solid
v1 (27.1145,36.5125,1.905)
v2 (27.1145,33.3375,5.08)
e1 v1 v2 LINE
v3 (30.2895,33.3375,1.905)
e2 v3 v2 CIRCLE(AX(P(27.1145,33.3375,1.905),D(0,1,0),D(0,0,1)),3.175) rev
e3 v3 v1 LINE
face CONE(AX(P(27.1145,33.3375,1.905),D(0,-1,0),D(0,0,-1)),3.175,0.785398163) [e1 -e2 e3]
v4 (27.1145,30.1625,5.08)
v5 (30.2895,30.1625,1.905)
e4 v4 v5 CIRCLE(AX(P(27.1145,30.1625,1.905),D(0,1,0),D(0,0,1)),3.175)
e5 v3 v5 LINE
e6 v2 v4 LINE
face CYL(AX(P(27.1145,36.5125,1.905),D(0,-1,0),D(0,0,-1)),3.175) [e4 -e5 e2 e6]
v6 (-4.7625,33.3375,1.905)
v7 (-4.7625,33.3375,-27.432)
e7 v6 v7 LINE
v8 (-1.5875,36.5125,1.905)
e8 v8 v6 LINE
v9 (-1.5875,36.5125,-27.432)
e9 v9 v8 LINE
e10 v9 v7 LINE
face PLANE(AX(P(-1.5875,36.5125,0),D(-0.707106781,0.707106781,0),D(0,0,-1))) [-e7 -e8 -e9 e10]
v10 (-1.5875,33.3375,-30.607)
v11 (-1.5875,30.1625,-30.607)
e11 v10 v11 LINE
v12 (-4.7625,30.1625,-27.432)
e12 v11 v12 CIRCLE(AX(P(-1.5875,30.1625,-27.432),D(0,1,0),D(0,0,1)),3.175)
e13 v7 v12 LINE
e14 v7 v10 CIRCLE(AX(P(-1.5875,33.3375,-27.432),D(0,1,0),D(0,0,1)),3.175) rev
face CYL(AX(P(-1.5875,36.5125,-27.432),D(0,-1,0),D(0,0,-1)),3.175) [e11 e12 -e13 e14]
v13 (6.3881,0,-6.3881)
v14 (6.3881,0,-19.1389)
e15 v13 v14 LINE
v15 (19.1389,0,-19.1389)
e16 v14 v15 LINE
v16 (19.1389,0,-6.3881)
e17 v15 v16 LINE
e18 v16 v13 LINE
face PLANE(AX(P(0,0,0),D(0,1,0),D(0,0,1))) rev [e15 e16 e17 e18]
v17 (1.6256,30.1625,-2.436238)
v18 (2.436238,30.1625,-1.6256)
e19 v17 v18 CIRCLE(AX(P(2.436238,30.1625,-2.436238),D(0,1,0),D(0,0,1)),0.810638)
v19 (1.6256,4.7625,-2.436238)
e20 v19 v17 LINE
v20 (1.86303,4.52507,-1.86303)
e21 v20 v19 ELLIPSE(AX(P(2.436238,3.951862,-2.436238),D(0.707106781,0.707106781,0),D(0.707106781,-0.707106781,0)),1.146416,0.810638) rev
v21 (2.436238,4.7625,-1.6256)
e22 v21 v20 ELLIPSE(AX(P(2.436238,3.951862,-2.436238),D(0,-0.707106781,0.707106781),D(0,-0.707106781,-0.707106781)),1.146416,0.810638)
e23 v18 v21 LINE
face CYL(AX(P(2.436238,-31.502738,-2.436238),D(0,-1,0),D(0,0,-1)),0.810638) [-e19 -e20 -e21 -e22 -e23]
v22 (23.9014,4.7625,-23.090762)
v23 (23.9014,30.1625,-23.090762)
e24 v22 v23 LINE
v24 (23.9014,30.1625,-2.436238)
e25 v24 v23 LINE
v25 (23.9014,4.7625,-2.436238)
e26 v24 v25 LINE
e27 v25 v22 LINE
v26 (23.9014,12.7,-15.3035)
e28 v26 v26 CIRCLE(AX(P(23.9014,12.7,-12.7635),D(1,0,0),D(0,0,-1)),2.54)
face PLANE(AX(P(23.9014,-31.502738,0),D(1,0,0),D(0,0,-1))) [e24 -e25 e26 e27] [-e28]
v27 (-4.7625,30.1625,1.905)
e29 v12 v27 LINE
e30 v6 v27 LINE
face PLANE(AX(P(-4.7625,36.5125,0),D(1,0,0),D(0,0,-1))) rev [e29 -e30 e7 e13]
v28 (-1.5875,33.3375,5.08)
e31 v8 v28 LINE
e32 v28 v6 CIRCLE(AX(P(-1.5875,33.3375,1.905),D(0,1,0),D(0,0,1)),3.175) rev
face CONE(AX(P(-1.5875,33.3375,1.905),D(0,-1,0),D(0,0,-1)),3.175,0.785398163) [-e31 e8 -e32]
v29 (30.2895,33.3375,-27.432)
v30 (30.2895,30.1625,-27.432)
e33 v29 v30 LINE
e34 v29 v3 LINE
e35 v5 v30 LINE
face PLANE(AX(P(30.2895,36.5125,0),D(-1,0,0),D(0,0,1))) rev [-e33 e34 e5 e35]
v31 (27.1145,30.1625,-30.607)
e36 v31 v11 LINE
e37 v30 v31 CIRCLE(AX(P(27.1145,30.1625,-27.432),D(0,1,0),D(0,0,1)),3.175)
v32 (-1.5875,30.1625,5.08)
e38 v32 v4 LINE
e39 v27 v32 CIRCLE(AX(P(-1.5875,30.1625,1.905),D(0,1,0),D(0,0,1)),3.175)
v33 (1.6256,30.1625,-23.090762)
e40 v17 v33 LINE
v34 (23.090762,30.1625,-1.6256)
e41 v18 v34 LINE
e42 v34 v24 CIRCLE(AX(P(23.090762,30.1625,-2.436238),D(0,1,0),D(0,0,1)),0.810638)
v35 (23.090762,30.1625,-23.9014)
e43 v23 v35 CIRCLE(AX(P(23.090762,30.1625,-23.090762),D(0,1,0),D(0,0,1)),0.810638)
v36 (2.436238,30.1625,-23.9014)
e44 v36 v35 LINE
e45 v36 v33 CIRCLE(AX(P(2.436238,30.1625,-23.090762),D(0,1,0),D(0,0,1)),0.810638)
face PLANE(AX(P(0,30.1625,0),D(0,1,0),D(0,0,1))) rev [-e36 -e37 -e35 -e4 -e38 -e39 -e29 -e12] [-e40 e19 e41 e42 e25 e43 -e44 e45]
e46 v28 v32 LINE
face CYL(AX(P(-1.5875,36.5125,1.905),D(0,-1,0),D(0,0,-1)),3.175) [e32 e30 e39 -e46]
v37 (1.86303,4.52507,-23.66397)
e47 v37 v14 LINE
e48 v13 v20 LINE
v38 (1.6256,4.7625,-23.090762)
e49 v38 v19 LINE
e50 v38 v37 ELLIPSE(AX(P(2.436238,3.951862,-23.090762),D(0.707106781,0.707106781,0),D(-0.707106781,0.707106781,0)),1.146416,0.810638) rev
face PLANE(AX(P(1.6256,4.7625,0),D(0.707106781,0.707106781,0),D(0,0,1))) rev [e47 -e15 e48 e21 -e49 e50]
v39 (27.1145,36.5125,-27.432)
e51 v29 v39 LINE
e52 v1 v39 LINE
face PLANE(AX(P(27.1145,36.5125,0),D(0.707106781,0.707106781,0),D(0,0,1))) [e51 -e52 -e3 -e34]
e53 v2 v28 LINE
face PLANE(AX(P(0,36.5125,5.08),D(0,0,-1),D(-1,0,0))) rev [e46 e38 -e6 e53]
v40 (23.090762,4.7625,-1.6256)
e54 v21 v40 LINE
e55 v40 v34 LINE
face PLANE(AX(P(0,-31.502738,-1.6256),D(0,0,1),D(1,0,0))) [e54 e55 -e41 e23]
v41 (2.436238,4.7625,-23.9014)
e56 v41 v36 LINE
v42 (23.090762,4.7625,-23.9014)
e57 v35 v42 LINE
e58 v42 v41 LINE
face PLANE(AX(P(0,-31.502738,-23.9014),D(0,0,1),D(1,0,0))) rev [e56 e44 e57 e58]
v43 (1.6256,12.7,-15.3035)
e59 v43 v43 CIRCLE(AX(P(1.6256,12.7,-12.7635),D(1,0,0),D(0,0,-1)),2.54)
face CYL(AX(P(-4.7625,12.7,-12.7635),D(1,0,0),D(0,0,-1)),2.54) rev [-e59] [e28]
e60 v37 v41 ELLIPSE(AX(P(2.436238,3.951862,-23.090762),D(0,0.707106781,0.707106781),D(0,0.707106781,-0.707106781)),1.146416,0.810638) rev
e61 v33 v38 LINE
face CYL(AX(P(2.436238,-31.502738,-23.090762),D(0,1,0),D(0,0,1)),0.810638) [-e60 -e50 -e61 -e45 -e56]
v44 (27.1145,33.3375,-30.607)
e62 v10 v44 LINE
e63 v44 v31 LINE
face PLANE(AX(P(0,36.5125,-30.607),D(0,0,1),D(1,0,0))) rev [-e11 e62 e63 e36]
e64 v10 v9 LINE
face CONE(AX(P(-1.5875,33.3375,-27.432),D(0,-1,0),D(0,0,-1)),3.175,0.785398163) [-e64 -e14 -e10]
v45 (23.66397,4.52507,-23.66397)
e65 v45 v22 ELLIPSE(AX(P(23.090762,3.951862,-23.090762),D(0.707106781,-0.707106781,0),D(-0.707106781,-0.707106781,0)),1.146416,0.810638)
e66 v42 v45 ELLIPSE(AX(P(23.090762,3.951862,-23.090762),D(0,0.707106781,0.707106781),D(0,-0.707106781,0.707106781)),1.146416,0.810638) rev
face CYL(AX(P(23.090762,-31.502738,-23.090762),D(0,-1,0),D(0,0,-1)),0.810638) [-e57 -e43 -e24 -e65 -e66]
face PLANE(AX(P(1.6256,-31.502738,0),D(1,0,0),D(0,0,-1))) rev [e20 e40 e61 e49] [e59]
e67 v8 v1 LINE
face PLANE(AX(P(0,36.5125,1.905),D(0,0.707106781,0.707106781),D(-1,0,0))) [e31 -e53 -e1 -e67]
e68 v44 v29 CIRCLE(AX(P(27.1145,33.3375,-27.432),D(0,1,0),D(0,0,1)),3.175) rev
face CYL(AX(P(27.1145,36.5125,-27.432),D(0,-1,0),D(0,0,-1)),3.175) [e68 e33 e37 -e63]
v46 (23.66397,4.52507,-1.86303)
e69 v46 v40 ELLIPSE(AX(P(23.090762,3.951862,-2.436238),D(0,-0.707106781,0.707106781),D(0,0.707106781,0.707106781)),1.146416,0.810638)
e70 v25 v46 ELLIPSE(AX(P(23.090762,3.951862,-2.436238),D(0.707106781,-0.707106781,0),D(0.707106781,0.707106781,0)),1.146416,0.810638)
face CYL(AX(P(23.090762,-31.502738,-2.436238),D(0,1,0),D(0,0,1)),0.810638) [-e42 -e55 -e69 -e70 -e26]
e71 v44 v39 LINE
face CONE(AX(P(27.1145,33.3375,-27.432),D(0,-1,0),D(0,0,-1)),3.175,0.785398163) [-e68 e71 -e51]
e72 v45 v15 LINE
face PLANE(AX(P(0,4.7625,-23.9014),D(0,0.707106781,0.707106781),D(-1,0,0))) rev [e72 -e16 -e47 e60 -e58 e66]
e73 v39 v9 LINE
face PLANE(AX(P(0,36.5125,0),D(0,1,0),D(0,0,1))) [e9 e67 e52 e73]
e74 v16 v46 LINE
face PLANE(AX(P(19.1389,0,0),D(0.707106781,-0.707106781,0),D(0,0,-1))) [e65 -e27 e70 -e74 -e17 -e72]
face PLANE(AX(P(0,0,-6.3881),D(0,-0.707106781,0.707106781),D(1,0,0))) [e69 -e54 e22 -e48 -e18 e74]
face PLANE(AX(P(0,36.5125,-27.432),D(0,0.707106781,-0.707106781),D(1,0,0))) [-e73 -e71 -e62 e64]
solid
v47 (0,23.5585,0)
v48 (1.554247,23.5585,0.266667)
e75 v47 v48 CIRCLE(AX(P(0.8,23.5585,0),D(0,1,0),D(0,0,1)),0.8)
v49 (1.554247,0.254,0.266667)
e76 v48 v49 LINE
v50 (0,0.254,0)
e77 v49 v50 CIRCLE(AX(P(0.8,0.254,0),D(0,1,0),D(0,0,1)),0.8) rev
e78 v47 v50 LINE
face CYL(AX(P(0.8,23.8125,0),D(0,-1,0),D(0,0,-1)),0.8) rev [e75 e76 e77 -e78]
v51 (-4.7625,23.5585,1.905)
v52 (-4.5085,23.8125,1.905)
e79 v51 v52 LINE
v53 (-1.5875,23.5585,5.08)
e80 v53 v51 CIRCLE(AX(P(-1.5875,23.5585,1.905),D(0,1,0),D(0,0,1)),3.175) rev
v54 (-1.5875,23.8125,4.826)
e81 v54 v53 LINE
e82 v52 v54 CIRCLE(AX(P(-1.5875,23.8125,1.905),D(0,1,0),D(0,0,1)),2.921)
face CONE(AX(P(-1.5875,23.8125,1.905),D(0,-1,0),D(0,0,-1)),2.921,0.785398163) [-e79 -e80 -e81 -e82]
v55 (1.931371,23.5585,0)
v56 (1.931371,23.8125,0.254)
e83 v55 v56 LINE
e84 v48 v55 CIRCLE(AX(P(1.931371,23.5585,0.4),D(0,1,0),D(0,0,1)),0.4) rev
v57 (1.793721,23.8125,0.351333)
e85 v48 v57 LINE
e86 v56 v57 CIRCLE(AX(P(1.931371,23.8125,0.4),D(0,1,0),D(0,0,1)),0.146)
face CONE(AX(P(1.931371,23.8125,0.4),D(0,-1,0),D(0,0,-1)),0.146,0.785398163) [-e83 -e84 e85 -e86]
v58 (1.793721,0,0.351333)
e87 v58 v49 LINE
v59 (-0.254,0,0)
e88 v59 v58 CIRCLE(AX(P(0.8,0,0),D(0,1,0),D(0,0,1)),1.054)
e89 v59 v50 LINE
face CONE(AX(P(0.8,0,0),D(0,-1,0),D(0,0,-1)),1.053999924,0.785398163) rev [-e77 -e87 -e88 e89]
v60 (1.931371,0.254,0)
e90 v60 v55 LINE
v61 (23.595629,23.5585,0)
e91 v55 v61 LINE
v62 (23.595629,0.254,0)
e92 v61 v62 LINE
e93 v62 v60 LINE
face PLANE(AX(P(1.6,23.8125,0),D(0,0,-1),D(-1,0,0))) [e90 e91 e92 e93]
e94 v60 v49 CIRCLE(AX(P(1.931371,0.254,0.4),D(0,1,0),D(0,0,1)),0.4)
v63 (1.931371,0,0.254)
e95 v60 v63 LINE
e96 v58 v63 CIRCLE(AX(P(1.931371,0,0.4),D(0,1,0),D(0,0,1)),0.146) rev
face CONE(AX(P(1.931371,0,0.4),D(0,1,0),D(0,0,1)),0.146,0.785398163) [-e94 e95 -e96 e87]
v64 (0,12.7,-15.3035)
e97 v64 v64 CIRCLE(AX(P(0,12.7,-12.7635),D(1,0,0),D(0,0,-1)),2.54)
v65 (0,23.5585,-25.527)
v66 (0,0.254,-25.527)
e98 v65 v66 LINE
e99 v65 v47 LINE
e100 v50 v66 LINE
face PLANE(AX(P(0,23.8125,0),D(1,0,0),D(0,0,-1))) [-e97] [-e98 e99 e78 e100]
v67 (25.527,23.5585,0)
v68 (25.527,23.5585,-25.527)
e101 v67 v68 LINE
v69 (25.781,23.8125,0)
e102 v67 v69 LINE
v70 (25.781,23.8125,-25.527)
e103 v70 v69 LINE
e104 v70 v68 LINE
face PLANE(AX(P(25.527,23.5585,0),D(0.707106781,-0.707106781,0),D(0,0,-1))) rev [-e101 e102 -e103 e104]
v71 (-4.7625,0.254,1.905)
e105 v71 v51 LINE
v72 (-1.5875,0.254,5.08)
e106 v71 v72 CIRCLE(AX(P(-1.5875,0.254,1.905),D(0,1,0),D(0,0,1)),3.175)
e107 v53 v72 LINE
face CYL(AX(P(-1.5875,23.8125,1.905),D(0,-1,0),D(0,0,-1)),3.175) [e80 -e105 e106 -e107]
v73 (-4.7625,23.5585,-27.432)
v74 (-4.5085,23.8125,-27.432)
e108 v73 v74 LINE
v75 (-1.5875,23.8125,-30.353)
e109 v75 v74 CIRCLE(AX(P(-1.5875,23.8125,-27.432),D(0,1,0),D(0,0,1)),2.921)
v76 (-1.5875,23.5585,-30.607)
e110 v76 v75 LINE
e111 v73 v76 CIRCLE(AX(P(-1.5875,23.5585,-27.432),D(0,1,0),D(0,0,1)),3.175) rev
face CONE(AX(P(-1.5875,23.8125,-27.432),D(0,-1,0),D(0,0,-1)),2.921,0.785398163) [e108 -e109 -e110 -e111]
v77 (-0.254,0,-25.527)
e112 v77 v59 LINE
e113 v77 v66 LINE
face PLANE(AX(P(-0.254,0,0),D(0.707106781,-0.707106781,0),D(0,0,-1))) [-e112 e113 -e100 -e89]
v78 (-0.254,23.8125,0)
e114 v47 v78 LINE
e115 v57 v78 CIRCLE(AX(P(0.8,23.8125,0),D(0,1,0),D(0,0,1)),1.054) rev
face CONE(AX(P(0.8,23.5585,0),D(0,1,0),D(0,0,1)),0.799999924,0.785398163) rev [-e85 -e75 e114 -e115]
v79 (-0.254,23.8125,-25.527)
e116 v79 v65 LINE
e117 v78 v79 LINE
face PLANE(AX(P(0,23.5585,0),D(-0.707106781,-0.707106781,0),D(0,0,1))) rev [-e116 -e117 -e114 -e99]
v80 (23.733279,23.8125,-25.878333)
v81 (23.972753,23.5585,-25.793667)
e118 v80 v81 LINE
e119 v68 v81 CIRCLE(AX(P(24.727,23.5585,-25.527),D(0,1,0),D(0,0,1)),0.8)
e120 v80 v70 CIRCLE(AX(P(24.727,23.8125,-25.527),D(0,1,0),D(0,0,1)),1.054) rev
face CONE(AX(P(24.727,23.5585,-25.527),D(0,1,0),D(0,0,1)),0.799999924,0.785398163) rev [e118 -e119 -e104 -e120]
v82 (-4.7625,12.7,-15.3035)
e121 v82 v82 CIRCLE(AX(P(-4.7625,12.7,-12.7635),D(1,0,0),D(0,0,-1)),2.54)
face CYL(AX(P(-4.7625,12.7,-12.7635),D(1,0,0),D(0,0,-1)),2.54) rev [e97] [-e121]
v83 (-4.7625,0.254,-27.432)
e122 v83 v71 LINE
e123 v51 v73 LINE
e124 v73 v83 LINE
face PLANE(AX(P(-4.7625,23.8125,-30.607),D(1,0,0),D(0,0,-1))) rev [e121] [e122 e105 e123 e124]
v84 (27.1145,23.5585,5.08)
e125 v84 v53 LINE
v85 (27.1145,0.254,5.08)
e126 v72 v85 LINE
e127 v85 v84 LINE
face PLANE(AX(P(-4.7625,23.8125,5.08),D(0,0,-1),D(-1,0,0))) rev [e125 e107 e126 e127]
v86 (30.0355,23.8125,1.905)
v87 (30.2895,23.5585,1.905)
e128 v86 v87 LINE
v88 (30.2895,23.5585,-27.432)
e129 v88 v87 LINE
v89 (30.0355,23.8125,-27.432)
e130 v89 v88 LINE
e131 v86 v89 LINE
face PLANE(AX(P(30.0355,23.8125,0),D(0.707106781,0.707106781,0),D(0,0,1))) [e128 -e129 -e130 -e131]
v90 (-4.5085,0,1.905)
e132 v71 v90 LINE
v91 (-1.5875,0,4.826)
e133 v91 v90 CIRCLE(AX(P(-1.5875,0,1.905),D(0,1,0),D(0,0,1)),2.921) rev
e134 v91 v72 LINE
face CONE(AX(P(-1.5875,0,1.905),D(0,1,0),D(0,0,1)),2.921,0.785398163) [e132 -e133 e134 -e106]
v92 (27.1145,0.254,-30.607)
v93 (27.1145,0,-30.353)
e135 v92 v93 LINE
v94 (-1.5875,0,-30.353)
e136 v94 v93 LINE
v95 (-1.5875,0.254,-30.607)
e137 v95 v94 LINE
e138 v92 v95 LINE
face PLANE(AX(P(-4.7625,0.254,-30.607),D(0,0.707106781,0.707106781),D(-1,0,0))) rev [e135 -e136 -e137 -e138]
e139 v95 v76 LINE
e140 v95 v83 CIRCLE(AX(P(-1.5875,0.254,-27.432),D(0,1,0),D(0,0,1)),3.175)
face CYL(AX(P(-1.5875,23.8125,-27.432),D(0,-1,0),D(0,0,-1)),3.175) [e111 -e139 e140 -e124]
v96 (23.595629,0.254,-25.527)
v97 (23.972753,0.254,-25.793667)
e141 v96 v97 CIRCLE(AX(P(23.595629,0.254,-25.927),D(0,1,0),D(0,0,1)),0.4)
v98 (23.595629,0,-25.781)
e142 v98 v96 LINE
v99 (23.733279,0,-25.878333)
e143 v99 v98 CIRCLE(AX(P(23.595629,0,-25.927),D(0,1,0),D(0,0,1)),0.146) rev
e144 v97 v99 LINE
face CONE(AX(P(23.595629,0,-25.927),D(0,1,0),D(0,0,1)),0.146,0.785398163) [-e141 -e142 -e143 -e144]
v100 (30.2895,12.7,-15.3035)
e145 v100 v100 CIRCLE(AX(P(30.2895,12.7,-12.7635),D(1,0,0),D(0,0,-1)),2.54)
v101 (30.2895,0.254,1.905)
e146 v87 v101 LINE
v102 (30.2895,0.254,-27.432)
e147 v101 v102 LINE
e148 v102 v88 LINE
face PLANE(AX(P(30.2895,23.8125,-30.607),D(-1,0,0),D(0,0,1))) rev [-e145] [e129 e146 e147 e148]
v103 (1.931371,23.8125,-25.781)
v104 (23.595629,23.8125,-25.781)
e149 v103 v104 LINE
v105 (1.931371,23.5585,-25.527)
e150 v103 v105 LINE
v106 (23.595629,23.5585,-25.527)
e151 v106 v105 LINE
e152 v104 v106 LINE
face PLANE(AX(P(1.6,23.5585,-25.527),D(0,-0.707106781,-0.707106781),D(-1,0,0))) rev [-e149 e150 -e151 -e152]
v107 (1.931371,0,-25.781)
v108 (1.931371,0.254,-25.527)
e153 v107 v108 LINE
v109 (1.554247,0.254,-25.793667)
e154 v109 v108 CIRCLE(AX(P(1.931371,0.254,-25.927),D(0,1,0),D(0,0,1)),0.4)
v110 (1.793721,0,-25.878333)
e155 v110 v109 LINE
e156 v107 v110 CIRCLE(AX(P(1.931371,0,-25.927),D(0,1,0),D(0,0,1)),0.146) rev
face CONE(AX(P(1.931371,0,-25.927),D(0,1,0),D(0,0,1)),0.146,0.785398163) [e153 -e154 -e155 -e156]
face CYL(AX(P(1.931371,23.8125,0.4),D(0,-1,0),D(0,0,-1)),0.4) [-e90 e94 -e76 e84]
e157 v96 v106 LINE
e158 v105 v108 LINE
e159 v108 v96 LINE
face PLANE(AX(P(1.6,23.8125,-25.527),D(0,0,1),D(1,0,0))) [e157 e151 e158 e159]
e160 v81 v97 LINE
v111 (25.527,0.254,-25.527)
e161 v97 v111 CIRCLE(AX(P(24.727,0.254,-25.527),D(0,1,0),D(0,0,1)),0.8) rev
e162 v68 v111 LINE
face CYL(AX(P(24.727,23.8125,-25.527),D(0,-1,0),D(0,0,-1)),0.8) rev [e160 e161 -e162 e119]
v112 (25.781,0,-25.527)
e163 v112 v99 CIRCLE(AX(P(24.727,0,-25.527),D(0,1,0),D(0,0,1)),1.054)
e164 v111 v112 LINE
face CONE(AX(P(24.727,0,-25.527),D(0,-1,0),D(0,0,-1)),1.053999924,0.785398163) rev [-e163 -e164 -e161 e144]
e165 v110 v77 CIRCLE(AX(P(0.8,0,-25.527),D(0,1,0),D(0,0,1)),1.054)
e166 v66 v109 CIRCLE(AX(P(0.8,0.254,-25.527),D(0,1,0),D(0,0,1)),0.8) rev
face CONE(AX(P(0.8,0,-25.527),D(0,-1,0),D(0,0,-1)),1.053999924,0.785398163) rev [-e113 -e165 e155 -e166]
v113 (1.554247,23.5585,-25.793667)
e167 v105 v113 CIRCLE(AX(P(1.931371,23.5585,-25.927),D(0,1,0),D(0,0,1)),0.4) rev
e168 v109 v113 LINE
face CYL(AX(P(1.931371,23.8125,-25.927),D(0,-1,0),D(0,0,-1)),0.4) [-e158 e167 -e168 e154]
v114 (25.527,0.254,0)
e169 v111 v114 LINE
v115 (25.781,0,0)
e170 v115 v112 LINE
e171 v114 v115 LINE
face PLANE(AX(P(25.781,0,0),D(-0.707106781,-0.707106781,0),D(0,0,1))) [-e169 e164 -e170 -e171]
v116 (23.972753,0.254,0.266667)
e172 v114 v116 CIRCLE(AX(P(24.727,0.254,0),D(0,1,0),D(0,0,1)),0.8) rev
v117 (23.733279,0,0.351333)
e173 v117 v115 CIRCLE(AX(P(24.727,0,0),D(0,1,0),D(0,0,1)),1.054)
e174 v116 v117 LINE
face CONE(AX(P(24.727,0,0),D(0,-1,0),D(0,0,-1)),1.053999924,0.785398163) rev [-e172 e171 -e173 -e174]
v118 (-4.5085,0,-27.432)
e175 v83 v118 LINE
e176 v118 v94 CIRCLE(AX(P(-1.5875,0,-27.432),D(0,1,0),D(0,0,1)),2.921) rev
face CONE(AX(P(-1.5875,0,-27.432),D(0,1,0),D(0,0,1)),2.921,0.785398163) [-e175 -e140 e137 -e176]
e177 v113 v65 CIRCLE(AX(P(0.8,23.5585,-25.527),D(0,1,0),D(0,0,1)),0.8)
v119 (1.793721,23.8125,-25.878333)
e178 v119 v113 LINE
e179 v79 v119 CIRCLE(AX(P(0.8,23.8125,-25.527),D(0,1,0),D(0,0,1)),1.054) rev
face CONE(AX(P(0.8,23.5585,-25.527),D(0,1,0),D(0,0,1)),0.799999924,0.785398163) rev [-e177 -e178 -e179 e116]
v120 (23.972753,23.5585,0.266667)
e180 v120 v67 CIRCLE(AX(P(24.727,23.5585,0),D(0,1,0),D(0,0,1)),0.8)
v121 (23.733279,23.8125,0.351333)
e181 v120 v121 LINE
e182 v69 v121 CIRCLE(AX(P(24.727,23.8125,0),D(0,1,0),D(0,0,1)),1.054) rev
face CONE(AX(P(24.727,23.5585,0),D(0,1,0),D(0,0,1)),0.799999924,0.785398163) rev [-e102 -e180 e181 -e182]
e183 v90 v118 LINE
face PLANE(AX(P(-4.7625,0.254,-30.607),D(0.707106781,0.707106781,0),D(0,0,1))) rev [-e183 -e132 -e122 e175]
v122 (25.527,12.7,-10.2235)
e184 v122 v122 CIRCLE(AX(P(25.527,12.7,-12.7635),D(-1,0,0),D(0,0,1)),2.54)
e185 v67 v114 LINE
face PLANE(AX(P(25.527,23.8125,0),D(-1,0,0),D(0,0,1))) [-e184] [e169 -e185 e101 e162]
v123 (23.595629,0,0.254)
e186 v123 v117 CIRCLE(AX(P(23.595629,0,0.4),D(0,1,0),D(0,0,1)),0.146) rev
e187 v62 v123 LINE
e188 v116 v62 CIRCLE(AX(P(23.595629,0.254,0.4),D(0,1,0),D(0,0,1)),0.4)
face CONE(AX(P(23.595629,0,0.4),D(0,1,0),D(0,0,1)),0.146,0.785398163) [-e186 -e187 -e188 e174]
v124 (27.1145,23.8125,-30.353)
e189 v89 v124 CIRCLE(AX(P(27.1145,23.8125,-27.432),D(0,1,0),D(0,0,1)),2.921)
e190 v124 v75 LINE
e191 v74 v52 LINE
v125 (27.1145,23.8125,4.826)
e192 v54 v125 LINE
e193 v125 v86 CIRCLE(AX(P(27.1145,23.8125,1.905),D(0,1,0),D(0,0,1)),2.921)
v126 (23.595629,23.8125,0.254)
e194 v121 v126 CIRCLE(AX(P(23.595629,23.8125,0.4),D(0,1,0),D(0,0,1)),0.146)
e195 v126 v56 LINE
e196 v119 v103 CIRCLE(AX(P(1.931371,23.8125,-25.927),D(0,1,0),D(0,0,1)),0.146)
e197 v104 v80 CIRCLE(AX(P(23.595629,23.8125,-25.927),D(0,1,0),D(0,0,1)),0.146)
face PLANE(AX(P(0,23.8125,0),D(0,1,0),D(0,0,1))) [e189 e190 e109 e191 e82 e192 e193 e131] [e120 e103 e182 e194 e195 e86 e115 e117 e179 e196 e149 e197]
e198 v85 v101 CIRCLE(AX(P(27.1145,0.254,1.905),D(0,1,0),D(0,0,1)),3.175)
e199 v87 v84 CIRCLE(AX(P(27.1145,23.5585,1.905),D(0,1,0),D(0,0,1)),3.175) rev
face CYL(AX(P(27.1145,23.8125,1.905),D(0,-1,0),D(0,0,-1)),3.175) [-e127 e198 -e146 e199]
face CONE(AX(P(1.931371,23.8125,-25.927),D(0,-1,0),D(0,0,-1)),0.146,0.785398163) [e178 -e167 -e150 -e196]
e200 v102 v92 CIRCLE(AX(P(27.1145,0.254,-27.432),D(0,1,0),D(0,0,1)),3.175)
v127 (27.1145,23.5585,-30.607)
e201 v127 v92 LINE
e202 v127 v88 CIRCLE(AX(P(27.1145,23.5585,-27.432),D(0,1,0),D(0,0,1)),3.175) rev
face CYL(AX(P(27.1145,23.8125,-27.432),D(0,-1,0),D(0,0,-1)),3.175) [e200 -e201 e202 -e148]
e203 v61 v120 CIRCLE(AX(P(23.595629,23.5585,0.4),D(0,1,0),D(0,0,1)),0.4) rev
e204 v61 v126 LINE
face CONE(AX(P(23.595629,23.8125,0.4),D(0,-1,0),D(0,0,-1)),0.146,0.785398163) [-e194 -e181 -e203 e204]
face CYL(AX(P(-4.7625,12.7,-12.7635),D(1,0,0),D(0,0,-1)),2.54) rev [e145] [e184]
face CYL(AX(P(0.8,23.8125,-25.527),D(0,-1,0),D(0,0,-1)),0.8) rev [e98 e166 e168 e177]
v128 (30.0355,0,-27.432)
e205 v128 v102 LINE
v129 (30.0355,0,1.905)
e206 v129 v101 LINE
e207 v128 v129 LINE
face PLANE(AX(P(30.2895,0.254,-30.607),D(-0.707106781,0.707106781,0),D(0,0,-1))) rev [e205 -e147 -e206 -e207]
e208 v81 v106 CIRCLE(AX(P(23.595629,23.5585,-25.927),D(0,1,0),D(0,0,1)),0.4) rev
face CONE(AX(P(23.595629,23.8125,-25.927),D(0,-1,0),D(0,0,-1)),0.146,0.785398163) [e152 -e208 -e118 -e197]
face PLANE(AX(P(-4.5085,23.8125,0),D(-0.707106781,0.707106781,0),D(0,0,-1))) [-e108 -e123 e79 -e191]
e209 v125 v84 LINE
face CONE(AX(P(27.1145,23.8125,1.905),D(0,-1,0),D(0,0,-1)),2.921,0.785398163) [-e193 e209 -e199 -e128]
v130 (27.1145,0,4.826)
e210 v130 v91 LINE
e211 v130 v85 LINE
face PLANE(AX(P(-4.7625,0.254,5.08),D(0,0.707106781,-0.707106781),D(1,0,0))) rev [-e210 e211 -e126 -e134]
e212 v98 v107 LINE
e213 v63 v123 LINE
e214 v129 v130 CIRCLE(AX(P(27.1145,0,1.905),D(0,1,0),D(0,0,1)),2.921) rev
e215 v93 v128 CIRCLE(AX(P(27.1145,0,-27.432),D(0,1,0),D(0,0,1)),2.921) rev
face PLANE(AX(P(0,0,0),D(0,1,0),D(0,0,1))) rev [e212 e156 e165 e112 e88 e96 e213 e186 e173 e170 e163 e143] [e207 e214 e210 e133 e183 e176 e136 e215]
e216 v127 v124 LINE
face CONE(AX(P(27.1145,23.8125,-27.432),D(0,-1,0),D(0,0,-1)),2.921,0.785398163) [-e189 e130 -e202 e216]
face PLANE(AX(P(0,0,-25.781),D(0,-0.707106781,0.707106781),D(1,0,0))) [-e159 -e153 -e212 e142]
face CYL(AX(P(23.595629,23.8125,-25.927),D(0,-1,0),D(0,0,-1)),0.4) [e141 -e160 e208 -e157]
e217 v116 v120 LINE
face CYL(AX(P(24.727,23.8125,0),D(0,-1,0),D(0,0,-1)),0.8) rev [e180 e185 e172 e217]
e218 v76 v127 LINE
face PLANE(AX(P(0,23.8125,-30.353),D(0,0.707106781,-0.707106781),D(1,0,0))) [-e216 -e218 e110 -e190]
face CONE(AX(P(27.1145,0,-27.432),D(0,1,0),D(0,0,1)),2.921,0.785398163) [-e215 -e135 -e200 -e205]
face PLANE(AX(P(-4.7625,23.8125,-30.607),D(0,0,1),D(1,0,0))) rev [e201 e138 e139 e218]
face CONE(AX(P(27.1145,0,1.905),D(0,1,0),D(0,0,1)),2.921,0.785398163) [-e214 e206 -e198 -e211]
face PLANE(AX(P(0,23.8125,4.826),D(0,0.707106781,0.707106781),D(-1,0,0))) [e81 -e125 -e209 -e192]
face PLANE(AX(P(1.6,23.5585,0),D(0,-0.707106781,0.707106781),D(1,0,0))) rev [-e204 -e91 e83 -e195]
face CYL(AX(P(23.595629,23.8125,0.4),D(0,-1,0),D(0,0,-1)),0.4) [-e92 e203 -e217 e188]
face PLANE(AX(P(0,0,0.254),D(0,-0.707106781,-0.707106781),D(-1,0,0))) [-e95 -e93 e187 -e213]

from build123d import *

# Parameters (mm, degrees)
SKETCH1_W           = 35.052
SKETCH1_H           = 35.687
BOSS_EXTRUDE1_DEPTH = 23.8125
FILLET1_R           = 3.175
FILLET2_R           = 0.4
SKETCH2_W           = 22.2758
SKETCH2_H           = 22.2758
BOSS_EXTRUDE2_DEPTH = 6.35
SKETCH2_4_W         = 22.2758
SKETCH2_4_H         = 22.2758
BOSS_EXTRUDE3_DEPTH = 30.1625
CHAMFER1_SIZE       = 3.175
CHAMFER2_SIZE       = 4.7625
CHAMFER3_SIZE       = 0.254
FILLET3_R           = 0.810638298
SKETCH3_R           = 2.54
CUT_EXTRUDE1_DEPTH  = 60.148912156


with BuildPart() as part:
    # Sketch1 → Boss-Extrude1 (new body)
    with BuildSketch(Plane(origin=(0, 0, 0), x_dir=(1, 0, 0), z_dir=(0, 1, 0))):
        with Locations((12.7635, 12.7635)):
            Rectangle(SKETCH1_W, SKETCH1_H)
        with BuildLine():
            Line((1.599999848, 0), (23.927000152, 0))
            ThreePointArc((23.927000152, 0), (24.727000076, -0.799999924), (25.527, 0))
            Line((25.527, 0), (25.527, 25.527))
            ThreePointArc((25.527, 25.527), (24.727000076, 26.326999924), (23.927000152, 25.527))
            Line((23.927000152, 25.527), (1.599999848, 25.527))
            ThreePointArc((1.599999848, 25.527), (0.799999924, 26.326999924), (0, 25.527))
            Line((0, 25.527), (0, 0))
            ThreePointArc((0, 0), (0.799999924, -0.799999924), (1.599999848, 0))
        make_face(mode=Mode.SUBTRACT)
    extrude(amount=BOSS_EXTRUDE1_DEPTH)

    # Fillet1
    fillet1_edges = [part.edges().sort_by_distance(p)[0] for p in [
        (-4.7625, 11.90625, -30.607),
        (30.2895, 11.90625, -30.607),
        (30.2895, 11.90625, 5.08),
        (-4.7625, 11.90625, 5.08),
    ]]
    fillet(fillet1_edges, radius=FILLET1_R)

    # Fillet2
    fillet2_edges = [part.edges().sort_by_distance(p)[0] for p in [
        (1.599999848, 11.90625, 0),
        (23.927000152, 11.90625, 0),
        (23.927000152, 11.90625, -25.527),
        (1.599999848, 11.90625, -25.527),
    ]]
    fillet(fillet2_edges, radius=FILLET2_R)

    # Chamfer3
    chamfer3_edges = [part.edges().sort_by_distance(p)[0] for p in [
        (0.664718345, 0, 0.788478771),
        (25.527, 0, -12.7635),
        (24.862281655, 0, -26.315478771),
        (0, 0, -12.7635),
        (0.664718345, 23.8125, 0.788478771),
        (25.527, 23.8125, -12.7635),
        (24.862281655, 23.8125, -26.315478771),
        (0, 23.8125, -12.7635),
        (-4.7625, 0, -12.7635),
        (-4.7625, 23.8125, -12.7635),
        (12.7635, 0, -30.607),
        (30.2895, 0, -12.7635),
        (12.7635, 0, 5.08),
        (-3.83256403, 0, 4.15006403),
        (29.35956403, 0, 4.15006403),
        (29.35956403, 0, -29.67706403),
        (-3.83256403, 0, -29.67706403),
        (12.7635, 23.8125, -30.607),
        (12.7635, 23.8125, 5.08),
        (30.2895, 23.8125, -12.7635),
        (-3.83256403, 23.8125, 4.15006403),
        (29.35956403, 23.8125, 4.15006403),
        (29.35956403, 23.8125, -29.67706403),
        (-3.83256403, 23.8125, -29.67706403),
        (12.7635, 0, 0),
        (12.7635, 23.8125, 0),
        (24.862281655, 0, 0.788478771),
        (12.7635, 0, -25.527),
        (0.664718345, 0, -26.315478771),
        (1.700430589, 0, 0.073401365),
        (1.700430589, 0, -25.600401365),
        (23.826569411, 0, -25.600401365),
        (23.826569411, 0, 0.073401365),
        (24.862281655, 23.8125, 0.788478771),
        (0.664718345, 23.8125, -26.315478771),
        (12.7635, 23.8125, -25.527),
        (1.700430589, 23.8125, 0.073401365),
        (1.700430589, 23.8125, -25.600401365),
        (23.826569411, 23.8125, -25.600401365),
        (23.826569411, 23.8125, 0.073401365),
    ]]
    chamfer(chamfer3_edges, length=CHAMFER3_SIZE)


with BuildPart() as body_2:
    # Sketch2 → Boss-Extrude2 (new body)
    # profile 1 of 2: a face of its own
    with BuildSketch(Plane(origin=(0, 30.1625, 0), x_dir=(1, 0, 0), z_dir=(0, 1, 0))):
        with BuildLine():
            Line((30.2895, -1.905), (30.2895, 27.432))
            ThreePointArc((30.2895, 27.432), (29.35956403, 29.67706403), (27.1145, 30.607))
            Line((27.1145, 30.607), (-1.5875, 30.607))
            ThreePointArc((-1.5875, 30.607), (-3.83256403, 29.67706403), (-4.7625, 27.432))
            Line((-4.7625, 27.432), (-4.7625, -1.905))
            ThreePointArc((-4.7625, -1.905), (-3.83256403, -4.15006403), (-1.5875, -5.08))
            Line((-1.5875, -5.08), (27.1145, -5.08))
            ThreePointArc((27.1145, -5.08), (29.35956403, -4.15006403), (30.2895, -1.905))
        make_face()
        with Locations((12.7635, 12.7635)):
            Rectangle(SKETCH2_W, SKETCH2_H, mode=Mode.SUBTRACT)
    # profile 2 of 2: a face of its own
    with BuildSketch(Plane(origin=(0, 30.1625, 0), x_dir=(1, 0, 0), z_dir=(0, 1, 0))):
        with Locations((12.7635, 12.7635)):
            Rectangle(SKETCH2_W, SKETCH2_H)
    extrude(amount=BOSS_EXTRUDE2_DEPTH)

    # Sketch2<4> → Boss-Extrude3 (add)
    with BuildSketch(Plane(origin=(0, 30.1625, 0), x_dir=(1, 0, 0), z_dir=(0, 1, 0))):
        with Locations((12.7635, 12.7635)):
            Rectangle(SKETCH2_4_W, SKETCH2_4_H)
    extrude(amount=-BOSS_EXTRUDE3_DEPTH)

    # Chamfer1
    chamfer1_edges = [body_2.edges().sort_by_distance(p)[0] for p in [
        (29.35956403, 36.5125, -29.67706403),
        (12.7635, 36.5125, -30.607),
        (-3.83256403, 36.5125, -29.67706403),
        (-4.7625, 36.5125, -12.7635),
        (-3.83256403, 36.5125, 4.15006403),
        (12.7635, 36.5125, 5.08),
        (29.35956403, 36.5125, 4.15006403),
        (30.2895, 36.5125, -12.7635),
    ]]
    chamfer(chamfer1_edges, length=CHAMFER1_SIZE - 0.0001)  # a hair under: the kernel refuses the full size

    # Chamfer2
    chamfer2_edges = [body_2.edges().sort_by_distance(p)[0] for p in [
        (1.6256, 0, -12.7635),
        (12.7635, 0, -23.9014),
        (23.9014, 0, -12.7635),
        (12.7635, 0, -1.6256),
    ]]
    chamfer(chamfer2_edges, length=CHAMFER2_SIZE)

    # Fillet3
    fillet3_edges = [body_2.edges().sort_by_distance(p)[0] for p in [
        (1.6256, 17.4625, -23.9014),
        (1.6256, 17.4625, -1.6256),
        (23.9014, 17.4625, -1.6256),
        (23.9014, 17.4625, -23.9014),
    ]]
    fillet(fillet3_edges, radius=FILLET3_R)


with BuildPart() as cut_extrude1_tool:
    # Sketch3 → Cut-Extrude1 (new, through all)
    with BuildSketch(Plane(origin=(30.2895, 0, 0), x_dir=(0, 0, -1), z_dir=(1, 0, 0))):
        with Locations((12.7635, 12.7)):
            Circle(SKETCH3_R)
    extrude(amount=-CUT_EXTRUDE1_DEPTH)


with BuildPart() as part_1:
    add(part.part)

    # Cut-Extrude1: cut by cut_extrude1_tool
    add(cut_extrude1_tool.part, mode=Mode.SUBTRACT)


with BuildPart() as body_2_1:
    add(body_2.part)

    # Cut-Extrude1: cut by cut_extrude1_tool
    add(cut_extrude1_tool.part, mode=Mode.SUBTRACT)


solid = Compound([part_1.part, body_2_1.part])
